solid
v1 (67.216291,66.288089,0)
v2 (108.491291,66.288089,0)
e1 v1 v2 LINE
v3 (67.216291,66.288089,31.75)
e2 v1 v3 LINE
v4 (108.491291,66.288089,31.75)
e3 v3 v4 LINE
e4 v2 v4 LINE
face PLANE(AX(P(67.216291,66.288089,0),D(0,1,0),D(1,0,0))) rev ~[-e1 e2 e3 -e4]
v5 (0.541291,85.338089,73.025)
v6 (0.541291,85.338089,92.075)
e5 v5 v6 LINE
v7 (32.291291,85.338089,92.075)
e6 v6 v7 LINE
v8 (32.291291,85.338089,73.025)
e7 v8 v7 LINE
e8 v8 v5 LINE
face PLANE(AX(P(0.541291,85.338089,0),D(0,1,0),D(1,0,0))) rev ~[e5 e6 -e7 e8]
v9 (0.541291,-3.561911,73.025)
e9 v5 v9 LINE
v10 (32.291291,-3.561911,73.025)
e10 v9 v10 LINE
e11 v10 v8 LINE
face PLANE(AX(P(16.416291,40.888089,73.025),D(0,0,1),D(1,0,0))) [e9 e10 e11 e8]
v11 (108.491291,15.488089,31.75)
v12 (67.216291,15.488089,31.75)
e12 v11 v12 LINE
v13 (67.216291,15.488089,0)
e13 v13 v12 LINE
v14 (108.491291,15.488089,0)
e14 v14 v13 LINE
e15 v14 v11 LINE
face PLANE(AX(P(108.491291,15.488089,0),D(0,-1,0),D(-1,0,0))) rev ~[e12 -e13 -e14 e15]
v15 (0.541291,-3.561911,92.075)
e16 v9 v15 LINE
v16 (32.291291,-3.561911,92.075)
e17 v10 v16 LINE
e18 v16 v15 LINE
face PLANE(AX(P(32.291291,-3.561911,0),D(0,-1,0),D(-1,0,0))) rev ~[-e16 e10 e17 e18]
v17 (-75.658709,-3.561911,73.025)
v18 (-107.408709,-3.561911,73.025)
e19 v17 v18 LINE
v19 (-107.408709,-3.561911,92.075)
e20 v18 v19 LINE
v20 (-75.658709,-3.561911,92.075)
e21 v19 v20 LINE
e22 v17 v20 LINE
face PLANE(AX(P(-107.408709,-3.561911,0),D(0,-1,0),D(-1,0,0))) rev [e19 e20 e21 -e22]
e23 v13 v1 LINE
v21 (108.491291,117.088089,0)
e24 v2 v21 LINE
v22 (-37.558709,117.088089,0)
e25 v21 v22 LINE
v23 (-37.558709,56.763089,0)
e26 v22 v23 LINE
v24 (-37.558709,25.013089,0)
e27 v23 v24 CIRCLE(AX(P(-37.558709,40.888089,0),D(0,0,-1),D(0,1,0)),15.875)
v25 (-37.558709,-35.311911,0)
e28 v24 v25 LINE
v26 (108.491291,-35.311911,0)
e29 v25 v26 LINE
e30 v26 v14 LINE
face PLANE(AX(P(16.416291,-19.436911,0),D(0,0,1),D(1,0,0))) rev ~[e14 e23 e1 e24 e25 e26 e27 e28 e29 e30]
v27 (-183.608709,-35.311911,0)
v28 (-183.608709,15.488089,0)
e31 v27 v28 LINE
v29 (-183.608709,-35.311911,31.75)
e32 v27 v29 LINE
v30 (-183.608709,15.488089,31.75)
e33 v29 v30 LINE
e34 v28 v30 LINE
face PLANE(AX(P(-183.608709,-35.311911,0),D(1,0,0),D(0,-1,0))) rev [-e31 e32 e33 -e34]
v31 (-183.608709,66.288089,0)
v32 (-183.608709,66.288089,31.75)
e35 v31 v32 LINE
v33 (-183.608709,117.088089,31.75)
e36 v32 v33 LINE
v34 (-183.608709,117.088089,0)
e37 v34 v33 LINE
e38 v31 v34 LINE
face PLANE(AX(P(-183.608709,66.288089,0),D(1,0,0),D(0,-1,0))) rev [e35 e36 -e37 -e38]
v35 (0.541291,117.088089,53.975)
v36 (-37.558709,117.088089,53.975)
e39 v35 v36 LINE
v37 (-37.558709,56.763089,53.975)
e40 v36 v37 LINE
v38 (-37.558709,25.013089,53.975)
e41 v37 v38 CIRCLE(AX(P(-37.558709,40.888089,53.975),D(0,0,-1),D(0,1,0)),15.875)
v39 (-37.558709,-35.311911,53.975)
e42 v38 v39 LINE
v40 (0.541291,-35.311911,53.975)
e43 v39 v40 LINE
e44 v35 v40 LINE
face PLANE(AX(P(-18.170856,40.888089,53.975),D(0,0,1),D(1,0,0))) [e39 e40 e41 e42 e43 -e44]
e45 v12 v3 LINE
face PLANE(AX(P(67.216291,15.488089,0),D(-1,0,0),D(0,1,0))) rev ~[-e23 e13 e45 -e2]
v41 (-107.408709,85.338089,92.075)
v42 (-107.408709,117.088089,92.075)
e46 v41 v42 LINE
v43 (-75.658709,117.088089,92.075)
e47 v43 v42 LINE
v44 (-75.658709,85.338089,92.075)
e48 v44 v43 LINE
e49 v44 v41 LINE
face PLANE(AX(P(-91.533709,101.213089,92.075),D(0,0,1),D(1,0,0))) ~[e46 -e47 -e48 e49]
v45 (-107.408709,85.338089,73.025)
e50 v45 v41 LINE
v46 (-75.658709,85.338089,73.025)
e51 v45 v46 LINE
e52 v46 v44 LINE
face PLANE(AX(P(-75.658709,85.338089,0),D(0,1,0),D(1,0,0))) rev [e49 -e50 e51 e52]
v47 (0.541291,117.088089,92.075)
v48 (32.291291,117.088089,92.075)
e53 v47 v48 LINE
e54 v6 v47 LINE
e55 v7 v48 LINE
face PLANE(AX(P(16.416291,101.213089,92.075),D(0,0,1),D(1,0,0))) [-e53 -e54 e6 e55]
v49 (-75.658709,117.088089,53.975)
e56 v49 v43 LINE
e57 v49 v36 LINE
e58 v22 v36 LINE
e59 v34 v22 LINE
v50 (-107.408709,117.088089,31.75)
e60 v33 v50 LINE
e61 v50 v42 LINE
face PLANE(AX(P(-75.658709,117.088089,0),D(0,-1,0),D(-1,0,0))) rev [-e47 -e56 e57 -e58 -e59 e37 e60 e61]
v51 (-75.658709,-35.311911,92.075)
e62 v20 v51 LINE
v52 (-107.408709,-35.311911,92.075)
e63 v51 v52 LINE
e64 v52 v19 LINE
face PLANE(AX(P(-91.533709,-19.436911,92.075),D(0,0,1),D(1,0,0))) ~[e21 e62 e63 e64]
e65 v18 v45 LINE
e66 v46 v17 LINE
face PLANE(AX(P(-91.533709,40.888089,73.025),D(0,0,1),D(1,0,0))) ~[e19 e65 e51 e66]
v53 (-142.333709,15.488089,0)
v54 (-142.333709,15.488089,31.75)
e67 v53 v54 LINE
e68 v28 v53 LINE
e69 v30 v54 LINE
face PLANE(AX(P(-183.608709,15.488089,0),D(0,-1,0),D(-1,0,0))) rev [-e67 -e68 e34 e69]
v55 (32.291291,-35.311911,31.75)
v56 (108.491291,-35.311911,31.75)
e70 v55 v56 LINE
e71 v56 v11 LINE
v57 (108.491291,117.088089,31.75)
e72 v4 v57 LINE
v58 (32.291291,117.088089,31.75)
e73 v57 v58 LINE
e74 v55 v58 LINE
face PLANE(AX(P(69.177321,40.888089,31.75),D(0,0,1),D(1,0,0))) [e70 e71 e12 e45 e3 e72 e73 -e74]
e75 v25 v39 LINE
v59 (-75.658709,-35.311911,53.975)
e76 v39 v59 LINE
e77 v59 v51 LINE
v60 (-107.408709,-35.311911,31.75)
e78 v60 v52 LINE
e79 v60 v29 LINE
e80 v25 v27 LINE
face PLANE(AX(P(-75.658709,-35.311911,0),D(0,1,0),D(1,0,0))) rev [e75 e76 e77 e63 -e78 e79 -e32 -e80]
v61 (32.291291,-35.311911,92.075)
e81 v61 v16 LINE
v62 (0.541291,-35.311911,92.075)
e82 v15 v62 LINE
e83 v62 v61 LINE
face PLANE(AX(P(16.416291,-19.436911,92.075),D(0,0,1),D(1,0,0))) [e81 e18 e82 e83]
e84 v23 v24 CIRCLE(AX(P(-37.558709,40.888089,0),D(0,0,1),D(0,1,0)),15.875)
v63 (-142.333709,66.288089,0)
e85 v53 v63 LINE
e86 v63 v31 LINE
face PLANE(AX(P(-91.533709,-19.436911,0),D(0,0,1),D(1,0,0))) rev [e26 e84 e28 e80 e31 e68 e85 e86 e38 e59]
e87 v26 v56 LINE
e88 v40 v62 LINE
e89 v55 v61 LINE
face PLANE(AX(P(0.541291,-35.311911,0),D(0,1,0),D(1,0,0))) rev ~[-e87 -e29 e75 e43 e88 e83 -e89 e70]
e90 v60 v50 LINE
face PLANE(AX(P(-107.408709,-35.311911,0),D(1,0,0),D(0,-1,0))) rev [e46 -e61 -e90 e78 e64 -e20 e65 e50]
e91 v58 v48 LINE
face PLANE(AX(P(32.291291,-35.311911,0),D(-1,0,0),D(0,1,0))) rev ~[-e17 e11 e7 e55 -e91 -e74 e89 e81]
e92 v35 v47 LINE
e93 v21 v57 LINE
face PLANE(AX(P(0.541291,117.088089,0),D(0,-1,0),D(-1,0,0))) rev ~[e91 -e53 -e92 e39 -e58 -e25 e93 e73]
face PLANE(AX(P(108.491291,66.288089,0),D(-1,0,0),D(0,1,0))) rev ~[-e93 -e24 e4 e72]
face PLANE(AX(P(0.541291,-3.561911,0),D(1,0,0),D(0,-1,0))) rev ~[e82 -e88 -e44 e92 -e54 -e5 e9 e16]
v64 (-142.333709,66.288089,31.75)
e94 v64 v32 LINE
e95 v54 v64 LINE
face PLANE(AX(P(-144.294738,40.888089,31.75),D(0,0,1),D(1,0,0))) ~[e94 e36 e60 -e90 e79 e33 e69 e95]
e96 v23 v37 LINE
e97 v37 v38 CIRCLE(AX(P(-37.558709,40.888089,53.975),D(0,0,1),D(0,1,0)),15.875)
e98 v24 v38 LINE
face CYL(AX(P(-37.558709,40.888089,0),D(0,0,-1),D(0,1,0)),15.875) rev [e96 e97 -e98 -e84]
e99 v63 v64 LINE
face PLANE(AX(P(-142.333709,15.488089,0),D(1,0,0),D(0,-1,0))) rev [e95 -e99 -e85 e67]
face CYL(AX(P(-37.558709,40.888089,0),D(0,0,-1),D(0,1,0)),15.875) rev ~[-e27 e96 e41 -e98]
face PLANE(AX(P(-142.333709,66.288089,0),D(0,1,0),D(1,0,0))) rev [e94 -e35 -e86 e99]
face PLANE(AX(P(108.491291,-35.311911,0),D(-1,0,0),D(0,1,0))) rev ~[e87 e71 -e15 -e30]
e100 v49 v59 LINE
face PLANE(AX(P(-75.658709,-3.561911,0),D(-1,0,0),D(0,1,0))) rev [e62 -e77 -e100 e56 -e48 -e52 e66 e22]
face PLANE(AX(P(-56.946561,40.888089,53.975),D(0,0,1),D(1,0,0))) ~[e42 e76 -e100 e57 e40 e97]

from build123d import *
from build123d import SkipClean  # not in build123d's __all__

# Parameters (mm, degrees)
F1_DEPTH = 31.75
F2_DEPTH = 53.975
F3_DEPTH = 73.025
F0_W     = 31.75
F0_H     = 31.75
F4_DEPTH = 92.075
F5_DEPTH = 73.025


with BuildPart() as f1:
    # F0 (on Top) → F1 (new body)
    with BuildSketch(Plane.XY):
        Polygon((108.4912913322, 117.0880892358), (32.2912913322, 117.0880892358), (32.2912913322, 85.3380892358), (32.2912913322, 15.4880892358), (32.2912913322, -3.5619107642), (32.2912913322, -16.2619107642), (32.2912913322, -35.3119107642), (108.4912913322, -35.3119107642), (108.4912913322, 15.4880892358), (67.2162913322, 15.4880892358), (67.2162913322, 66.2880892358), (108.4912913322, 66.2880892358), align=None)
    extrude(amount=F1_DEPTH)



with BuildPart() as f2:
    # F0 (on Top) → F2 (new body)
    with BuildSketch(Plane.XY):
        with BuildLine():
            Line((0.5412913322, 117.0880892358), (-37.5587086678, 117.0880892358))
            Line((-37.5587086678, 117.0880892358), (-37.5587086678, 56.7630892358))
            ThreePointArc((-37.5587086678, 56.7630892358), (-21.6837086678, 40.8880892358), (-37.5587086678, 25.0130892358))
            Line((-37.5587086678, 25.0130892358), (-37.5587086678, -35.3119107642))
            Line((-37.5587086678, -35.3119107642), (0.5412913322, -35.3119107642))
            Line((0.5412913322, -35.3119107642), (0.5412913322, -3.5619107642))
            Line((0.5412913322, -3.5619107642), (0.5412913322, 15.4880892358))
            Line((0.5412913322, 15.4880892358), (0.5412913322, 85.3380892358))
            Line((0.5412913322, 85.3380892358), (0.5412913322, 117.0880892358))
        make_face()
    extrude(amount=F2_DEPTH)


with BuildPart() as f1_1:
    add(f1.part, clean=False)

    add(f2.part)  # F3 merges F2
    # F0 (on Top) → F3 (join)
    with BuildSketch(Plane.XY):
        Polygon((32.2912913322, 85.3380892358), (0.5412913322, 85.3380892358), (0.5412913322, 15.4880892358), (0.5412913322, -3.5619107642), (32.2912913322, -3.5619107642), (32.2912913322, 15.4880892358), align=None)
    extrude(amount=F3_DEPTH)

    # F0 (on Top) → F4 (join)
    with BuildSketch(Plane.XY):
        Polygon((32.2912913322, -3.5619107642), (0.5412913322, -3.5619107642), (0.5412913322, -35.3119107642), (32.2912913322, -35.3119107642), (32.2912913322, -16.2619107642), align=None)
        with Locations((16.4162913322, 101.2130892358)):
            Rectangle(F0_W, F0_H)
    extrude(amount=F4_DEPTH)

    # F0 (on Top) → F5 (join)
    with BuildSketch(Plane.XY):
        Polygon((32.2912913322, 85.3380892358), (0.5412913322, 85.3380892358), (0.5412913322, 15.4880892358), (0.5412913322, -3.5619107642), (32.2912913322, -3.5619107642), (32.2912913322, 15.4880892358), align=None)
    extrude(amount=F5_DEPTH)

    # F6: F1 across face


with BuildPart() as f1_2:
    add(f1_1.part, clean=False)
    with SkipClean():  # cleaning this boolean's faces spoils the solid; the shape is the same uncleaned
        add(f1_1.part.mirror(Plane(origin=(-37.5587086678, 86.9255892358, 26.9875), x_dir=(0, -1, 0), z_dir=(-1, 0, 0))), clean=False)


solid = f1_2.part
